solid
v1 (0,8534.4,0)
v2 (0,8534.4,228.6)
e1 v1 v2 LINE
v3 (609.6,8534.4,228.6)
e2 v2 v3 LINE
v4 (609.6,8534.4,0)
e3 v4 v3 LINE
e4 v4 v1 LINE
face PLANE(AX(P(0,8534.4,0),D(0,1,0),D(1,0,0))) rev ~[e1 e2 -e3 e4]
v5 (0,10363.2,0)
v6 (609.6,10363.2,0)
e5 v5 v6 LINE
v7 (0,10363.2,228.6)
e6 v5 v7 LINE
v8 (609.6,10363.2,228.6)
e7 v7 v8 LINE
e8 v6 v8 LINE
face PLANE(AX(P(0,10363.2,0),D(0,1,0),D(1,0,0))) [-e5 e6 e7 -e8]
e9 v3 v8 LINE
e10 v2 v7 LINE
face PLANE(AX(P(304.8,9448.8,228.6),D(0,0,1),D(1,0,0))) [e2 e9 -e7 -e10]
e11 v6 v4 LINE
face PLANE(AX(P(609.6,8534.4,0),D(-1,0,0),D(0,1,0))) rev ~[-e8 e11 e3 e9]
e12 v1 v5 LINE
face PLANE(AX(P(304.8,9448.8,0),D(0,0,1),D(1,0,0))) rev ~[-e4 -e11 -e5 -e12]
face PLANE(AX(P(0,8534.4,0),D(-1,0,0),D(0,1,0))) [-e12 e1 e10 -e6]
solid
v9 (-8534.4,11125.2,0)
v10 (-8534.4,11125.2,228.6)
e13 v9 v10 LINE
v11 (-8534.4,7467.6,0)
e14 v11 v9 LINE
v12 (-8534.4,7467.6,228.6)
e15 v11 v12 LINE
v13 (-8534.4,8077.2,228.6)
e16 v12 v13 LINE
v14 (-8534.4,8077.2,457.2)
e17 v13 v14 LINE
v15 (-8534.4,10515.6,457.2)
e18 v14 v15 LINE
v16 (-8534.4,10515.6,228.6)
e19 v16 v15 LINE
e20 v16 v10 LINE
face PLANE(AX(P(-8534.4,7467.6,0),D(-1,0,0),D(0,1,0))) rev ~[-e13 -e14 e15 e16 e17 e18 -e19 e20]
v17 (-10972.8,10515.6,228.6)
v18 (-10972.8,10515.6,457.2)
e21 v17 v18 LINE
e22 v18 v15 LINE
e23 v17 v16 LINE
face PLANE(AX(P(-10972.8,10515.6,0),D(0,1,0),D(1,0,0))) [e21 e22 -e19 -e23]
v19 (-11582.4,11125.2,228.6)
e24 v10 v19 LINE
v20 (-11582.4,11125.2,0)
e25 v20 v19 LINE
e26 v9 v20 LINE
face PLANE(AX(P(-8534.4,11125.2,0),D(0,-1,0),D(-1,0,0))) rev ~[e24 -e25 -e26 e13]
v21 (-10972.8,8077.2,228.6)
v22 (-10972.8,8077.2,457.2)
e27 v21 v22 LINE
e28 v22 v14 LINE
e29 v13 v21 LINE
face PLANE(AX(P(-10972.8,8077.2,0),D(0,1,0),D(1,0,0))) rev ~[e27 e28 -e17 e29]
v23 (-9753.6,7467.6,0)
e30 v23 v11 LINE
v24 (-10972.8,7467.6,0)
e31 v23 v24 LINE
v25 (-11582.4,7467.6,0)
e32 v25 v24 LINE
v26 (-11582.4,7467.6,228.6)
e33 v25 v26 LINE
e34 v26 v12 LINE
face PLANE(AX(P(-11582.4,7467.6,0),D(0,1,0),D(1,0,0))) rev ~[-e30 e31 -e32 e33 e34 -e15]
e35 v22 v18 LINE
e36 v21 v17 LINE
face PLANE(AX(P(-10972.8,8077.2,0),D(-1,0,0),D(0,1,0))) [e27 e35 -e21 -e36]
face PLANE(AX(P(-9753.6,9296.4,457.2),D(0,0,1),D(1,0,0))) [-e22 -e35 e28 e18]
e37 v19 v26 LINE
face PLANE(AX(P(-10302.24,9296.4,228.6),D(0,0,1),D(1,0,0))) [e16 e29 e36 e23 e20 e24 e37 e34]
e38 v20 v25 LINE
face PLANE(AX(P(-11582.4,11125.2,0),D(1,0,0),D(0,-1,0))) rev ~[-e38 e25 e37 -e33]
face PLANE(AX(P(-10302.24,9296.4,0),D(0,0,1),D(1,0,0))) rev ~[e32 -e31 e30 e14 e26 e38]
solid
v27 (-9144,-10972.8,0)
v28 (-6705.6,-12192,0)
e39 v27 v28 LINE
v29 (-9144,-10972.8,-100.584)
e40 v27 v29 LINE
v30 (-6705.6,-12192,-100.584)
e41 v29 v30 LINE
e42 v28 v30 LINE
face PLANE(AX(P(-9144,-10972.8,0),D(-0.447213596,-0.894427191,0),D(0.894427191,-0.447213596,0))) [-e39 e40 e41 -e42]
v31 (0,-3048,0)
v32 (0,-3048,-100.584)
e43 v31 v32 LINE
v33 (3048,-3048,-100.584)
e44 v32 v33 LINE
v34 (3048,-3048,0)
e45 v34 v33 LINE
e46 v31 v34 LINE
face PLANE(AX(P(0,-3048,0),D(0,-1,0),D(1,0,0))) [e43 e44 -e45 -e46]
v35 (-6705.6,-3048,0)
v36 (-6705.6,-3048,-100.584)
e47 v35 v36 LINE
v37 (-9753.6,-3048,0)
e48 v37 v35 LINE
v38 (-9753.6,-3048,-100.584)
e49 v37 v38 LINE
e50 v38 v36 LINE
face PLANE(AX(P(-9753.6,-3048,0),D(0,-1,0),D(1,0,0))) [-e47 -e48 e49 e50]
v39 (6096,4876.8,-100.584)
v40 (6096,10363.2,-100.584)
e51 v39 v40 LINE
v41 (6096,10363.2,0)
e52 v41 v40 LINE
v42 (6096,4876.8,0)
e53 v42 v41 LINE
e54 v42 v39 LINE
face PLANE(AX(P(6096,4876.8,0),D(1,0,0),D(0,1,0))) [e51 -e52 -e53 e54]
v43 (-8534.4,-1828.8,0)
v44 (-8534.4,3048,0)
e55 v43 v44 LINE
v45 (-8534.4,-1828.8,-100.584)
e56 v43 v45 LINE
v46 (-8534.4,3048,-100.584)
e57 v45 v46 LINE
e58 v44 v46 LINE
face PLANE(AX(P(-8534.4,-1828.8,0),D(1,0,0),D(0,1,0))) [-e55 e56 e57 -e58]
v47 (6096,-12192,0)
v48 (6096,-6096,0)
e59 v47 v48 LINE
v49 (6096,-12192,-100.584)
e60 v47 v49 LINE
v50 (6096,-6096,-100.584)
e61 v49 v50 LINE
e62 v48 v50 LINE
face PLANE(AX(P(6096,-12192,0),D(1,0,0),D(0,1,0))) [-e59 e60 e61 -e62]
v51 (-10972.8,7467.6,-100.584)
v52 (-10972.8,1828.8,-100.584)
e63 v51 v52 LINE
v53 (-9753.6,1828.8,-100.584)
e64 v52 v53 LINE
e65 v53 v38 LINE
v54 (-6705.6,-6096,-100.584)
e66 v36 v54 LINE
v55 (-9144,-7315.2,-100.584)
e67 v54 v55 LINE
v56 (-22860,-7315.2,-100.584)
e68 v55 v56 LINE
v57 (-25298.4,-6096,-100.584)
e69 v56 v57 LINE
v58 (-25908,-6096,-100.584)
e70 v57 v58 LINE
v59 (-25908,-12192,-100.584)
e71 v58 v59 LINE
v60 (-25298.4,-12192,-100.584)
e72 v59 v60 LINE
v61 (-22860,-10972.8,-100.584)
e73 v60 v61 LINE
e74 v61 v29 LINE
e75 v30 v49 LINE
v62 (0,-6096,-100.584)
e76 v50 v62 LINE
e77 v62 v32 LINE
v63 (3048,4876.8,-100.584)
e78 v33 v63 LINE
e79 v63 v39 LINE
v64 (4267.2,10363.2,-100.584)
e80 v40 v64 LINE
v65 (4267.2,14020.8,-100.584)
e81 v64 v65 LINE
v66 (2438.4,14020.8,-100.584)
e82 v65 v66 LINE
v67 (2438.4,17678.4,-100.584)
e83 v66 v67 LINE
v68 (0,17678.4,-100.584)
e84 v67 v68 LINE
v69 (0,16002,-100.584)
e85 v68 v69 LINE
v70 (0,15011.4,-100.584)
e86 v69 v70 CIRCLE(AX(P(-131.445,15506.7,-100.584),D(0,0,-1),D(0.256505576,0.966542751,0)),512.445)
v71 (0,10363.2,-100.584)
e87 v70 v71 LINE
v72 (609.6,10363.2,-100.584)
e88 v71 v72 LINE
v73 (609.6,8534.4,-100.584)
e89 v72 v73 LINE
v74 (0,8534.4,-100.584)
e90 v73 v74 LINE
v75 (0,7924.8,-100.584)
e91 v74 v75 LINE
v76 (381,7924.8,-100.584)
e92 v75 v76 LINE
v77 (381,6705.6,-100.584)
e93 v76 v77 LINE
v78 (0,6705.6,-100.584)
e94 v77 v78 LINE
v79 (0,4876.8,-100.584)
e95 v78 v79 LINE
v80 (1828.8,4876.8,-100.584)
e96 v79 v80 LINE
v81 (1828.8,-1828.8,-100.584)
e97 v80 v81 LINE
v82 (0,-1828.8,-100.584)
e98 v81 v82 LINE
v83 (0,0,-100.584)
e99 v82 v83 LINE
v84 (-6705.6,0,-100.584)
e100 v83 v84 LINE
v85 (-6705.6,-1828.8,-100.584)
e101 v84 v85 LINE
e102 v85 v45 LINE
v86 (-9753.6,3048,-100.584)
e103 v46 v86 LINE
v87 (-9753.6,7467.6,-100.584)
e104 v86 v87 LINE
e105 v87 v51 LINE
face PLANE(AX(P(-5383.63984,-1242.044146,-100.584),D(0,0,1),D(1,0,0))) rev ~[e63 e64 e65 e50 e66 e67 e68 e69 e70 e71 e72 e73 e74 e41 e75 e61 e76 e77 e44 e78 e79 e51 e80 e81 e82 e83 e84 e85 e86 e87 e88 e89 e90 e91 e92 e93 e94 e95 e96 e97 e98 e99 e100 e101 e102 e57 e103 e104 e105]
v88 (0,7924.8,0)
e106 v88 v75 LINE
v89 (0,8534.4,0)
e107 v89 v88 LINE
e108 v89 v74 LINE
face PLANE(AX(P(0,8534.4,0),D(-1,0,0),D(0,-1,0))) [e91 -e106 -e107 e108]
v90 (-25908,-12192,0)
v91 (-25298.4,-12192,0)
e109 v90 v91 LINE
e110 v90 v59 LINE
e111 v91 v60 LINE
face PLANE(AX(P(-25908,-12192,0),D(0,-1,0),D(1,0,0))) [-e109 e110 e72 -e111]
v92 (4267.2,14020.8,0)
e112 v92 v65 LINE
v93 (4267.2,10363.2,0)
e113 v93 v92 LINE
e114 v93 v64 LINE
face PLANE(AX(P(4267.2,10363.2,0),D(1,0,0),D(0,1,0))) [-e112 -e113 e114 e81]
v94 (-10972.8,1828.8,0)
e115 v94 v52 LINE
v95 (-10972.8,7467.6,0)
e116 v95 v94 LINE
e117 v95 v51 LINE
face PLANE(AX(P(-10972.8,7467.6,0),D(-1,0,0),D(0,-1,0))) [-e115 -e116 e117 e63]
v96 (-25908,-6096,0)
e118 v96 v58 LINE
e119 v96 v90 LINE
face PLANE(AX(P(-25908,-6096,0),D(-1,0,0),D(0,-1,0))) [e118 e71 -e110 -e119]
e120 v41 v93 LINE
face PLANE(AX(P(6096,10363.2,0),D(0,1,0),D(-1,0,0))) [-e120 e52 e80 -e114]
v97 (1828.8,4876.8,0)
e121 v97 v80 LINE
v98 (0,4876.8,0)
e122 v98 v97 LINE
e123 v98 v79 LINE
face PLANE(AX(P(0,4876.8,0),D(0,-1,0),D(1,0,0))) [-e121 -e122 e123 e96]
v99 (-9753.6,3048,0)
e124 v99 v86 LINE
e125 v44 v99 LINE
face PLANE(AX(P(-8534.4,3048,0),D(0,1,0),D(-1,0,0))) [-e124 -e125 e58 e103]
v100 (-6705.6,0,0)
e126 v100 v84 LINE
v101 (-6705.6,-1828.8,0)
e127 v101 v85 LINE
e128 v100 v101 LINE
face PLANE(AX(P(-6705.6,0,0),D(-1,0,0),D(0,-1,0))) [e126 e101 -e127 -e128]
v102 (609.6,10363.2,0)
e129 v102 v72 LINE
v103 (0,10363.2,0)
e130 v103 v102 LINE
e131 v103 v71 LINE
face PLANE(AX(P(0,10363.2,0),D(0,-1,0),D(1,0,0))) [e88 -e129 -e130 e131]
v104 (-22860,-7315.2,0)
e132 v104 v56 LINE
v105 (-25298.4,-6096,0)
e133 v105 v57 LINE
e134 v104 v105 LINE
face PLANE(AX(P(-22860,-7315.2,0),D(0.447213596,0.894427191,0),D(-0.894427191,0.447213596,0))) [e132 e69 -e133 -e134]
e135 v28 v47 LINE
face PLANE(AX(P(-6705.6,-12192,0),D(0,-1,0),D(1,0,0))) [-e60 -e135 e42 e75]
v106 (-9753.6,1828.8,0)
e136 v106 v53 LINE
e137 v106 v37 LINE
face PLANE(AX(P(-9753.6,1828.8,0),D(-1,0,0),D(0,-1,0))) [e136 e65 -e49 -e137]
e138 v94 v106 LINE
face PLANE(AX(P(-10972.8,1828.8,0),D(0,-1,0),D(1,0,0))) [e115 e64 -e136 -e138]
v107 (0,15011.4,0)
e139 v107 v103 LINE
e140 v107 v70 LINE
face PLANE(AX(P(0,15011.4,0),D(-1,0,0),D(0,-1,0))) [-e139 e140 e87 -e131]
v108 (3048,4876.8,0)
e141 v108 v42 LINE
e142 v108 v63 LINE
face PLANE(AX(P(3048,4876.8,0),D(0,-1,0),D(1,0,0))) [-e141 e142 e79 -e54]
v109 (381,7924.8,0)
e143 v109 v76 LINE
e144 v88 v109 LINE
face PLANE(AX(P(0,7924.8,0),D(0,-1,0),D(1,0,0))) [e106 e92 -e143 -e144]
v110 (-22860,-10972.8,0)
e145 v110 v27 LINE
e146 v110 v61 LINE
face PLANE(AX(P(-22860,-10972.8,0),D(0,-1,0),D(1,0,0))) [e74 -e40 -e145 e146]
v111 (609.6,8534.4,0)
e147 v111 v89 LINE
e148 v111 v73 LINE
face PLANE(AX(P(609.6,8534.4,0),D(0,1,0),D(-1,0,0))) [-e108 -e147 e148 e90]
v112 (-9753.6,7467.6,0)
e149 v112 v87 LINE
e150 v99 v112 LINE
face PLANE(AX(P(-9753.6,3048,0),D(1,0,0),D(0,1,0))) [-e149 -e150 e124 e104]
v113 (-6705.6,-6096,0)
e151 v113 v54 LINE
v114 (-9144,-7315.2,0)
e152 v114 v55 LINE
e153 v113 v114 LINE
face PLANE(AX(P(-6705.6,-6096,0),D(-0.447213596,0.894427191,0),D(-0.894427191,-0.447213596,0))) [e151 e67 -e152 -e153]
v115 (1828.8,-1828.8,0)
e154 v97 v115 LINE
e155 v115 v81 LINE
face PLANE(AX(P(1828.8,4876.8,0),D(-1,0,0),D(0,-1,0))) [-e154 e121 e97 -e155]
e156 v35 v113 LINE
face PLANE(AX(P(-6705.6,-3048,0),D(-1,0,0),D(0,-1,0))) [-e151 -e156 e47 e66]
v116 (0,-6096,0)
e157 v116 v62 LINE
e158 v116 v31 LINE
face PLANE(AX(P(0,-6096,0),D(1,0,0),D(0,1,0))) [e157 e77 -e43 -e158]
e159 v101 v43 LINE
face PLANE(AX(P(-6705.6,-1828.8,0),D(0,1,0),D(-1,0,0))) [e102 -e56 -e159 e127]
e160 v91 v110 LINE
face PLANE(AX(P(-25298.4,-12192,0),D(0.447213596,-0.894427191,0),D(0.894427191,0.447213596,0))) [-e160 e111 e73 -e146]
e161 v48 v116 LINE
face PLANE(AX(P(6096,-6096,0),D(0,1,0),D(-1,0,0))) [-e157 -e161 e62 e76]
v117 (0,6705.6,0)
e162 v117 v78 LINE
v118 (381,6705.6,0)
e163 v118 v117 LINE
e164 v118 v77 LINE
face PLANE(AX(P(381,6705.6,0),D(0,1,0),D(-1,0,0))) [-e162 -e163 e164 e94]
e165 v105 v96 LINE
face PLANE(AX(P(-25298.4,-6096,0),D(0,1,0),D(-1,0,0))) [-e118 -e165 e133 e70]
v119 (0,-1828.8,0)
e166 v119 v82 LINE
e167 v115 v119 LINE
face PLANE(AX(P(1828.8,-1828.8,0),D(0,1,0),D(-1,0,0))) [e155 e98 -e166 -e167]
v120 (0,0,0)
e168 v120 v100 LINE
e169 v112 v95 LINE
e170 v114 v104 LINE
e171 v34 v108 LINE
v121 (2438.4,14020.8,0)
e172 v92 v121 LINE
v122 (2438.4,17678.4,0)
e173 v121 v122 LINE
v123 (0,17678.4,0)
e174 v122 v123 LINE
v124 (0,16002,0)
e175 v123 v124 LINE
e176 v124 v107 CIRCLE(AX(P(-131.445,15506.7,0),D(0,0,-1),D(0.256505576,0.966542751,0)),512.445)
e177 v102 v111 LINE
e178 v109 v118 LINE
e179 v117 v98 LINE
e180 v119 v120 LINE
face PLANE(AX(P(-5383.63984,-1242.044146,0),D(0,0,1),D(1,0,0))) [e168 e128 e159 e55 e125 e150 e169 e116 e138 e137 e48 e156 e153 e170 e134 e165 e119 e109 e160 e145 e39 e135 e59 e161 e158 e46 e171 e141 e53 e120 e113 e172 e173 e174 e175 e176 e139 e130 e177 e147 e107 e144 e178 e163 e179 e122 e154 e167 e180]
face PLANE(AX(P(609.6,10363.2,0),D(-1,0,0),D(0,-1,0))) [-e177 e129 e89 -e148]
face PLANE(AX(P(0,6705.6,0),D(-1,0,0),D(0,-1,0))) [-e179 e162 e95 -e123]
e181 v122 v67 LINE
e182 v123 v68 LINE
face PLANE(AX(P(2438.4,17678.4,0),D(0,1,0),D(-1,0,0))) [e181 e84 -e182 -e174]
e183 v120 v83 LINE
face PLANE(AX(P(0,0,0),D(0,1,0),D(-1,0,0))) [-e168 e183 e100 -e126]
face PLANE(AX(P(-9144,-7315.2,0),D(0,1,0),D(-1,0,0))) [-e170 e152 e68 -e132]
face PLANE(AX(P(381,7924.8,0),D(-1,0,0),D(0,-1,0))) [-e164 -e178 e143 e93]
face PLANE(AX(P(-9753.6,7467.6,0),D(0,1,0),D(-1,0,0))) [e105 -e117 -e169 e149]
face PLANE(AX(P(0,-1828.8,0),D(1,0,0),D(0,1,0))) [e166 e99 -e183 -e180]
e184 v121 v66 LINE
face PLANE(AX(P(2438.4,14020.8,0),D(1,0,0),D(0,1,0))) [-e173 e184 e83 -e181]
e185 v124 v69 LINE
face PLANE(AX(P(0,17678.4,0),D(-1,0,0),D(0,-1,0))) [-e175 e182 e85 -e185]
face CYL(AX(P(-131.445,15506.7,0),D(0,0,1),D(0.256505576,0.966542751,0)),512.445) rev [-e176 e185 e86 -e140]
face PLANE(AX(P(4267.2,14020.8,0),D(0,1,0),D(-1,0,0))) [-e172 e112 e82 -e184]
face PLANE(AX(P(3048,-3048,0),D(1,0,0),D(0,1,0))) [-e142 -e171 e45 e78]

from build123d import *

# Parameters (mm, degrees)
F1_DEPTH = 100.584
F0_W     = 609.6
F0_H     = 1828.8
F2_DEPTH = 228.6
F0_W_2   = 2438.4
F0_H_2   = 2438.4
F3_DEPTH = 457.2


# Not quite as in the source:
# - a feature names something its author has since deleted; it is built from what else it names


with BuildPart() as f1:
    # F0 (on Top) → F1 (new body)
    with BuildSketch(Plane.XY):
        with BuildLine():
            Line((0, -1828.8), (0, 0))
            Line((0, 0), (-6705.6, 0))
            Line((-6705.6, 0), (-6705.6, -1828.8))
            Line((-6705.6, -1828.8), (-8534.4, -1828.8))
            Line((-8534.4, -1828.8), (-8534.4, 3048))
            Line((-8534.4, 3048), (-9753.6, 3048))
            Line((-9753.6, 3048), (-9753.6, 7467.6))
            Line((-9753.6, 7467.6), (-10972.8, 7467.6))
            Line((-10972.8, 7467.6), (-10972.8, 1828.8))
            Line((-10972.8, 1828.8), (-9753.6, 1828.8))
            Line((-9753.6, 1828.8), (-9753.6, -3048))
            Line((-9753.6, -3048), (-6705.6, -3048))
            Line((-6705.6, -3048), (-6705.6, -6096))
            Line((-6705.6, -6096), (-9144, -7315.2))
            Line((-9144, -7315.2), (-22860, -7315.2))
            Line((-22860, -7315.2), (-25298.4, -6096))
            Line((-25298.4, -6096), (-25908, -6096))
            Line((-25908, -6096), (-25908, -12192))
            Line((-25908, -12192), (-25298.4, -12192))
            Line((-25298.4, -12192), (-22860, -10972.8))
            Line((-22860, -10972.8), (-9144, -10972.8))
            Line((-9144, -10972.8), (-6705.6, -12192))
            Line((-6705.6, -12192), (6096, -12192))
            Line((6096, -12192), (6096, -6096))
            Line((6096, -6096), (0, -6096))
            Line((0, -6096), (0, -3048))
            Line((0, -3048), (3048, -3048))
            Line((3048, -3048), (3048, 4876.8))
            Line((3048, 4876.8), (4267.2, 4876.8))
            Line((4267.2, 4876.8), (6096, 4876.8))
            Line((6096, 4876.8), (6096, 10363.2))
            Line((6096, 10363.2), (4267.2, 10363.2))
            Line((4267.2, 10363.2), (4267.2, 14020.8))
            Line((4267.2, 14020.8), (2438.4, 14020.8))
            Line((2438.4, 14020.8), (2438.4, 17678.4))
            Line((2438.4, 17678.4000000001), (0, 17678.4000000001))
            Line((0, 17678.4), (0, 16002))
            ThreePointArc((0, 16002), (381, 15506.7), (0, 15011.4))
            Line((0, 15011.4), (0, 14020.8))
            Line((0, 14020.8), (457.2, 13106.4))
            Line((457.2, 13106.4), (457.2, 11277.6))
            Line((457.2, 11277.6), (0, 10363.2))
            Line((0, 10363.2), (609.6, 10363.2))
            Line((609.6, 10363.2), (609.6, 8534.4))
            Line((609.6, 8534.4), (0, 8534.4))
            Line((0, 8534.4), (0, 7924.8))
            Line((0, 7924.8), (381, 7924.8))
            Line((381, 7924.8), (381, 6705.6))
            Line((381, 6705.6), (0, 6705.6))
            Line((0, 6705.6), (0, 4876.8))
            Line((0, 4876.8), (1828.8, 4876.8))
            Line((1828.8, 4876.8), (1828.8, -1828.8))
            Line((1828.8, -1828.8), (0, -1828.8))
        make_face()
        Polygon((0, 14020.8), (0, 10363.2), (457.2, 11277.6), (457.2, 13106.4), align=None)
    extrude(amount=-F1_DEPTH)

    # F0 (on Top) → F2 (join)
    with BuildSketch(Plane.XY):
        with Locations((304.8, 9448.8)):
            Rectangle(F0_W, F0_H)
        Polygon((-10972.8, 7467.6), (-9753.6, 7467.6), (-8534.4, 7467.6), (-8534.4, 8077.2), (-10972.8, 8077.2), (-10972.8, 10515.6), (-8534.4, 10515.6), (-8534.4, 11125.2), (-11582.4, 11125.2), (-11582.4, 7467.6), align=None)
    extrude(amount=F2_DEPTH)

    # F0 (on Top) → F3 (join)
    with BuildSketch(Plane.XY):
        with Locations((-9753.6, 9296.4)):
            Rectangle(F0_W_2, F0_H_2)
    extrude(amount=F3_DEPTH)


solid = f1.part
